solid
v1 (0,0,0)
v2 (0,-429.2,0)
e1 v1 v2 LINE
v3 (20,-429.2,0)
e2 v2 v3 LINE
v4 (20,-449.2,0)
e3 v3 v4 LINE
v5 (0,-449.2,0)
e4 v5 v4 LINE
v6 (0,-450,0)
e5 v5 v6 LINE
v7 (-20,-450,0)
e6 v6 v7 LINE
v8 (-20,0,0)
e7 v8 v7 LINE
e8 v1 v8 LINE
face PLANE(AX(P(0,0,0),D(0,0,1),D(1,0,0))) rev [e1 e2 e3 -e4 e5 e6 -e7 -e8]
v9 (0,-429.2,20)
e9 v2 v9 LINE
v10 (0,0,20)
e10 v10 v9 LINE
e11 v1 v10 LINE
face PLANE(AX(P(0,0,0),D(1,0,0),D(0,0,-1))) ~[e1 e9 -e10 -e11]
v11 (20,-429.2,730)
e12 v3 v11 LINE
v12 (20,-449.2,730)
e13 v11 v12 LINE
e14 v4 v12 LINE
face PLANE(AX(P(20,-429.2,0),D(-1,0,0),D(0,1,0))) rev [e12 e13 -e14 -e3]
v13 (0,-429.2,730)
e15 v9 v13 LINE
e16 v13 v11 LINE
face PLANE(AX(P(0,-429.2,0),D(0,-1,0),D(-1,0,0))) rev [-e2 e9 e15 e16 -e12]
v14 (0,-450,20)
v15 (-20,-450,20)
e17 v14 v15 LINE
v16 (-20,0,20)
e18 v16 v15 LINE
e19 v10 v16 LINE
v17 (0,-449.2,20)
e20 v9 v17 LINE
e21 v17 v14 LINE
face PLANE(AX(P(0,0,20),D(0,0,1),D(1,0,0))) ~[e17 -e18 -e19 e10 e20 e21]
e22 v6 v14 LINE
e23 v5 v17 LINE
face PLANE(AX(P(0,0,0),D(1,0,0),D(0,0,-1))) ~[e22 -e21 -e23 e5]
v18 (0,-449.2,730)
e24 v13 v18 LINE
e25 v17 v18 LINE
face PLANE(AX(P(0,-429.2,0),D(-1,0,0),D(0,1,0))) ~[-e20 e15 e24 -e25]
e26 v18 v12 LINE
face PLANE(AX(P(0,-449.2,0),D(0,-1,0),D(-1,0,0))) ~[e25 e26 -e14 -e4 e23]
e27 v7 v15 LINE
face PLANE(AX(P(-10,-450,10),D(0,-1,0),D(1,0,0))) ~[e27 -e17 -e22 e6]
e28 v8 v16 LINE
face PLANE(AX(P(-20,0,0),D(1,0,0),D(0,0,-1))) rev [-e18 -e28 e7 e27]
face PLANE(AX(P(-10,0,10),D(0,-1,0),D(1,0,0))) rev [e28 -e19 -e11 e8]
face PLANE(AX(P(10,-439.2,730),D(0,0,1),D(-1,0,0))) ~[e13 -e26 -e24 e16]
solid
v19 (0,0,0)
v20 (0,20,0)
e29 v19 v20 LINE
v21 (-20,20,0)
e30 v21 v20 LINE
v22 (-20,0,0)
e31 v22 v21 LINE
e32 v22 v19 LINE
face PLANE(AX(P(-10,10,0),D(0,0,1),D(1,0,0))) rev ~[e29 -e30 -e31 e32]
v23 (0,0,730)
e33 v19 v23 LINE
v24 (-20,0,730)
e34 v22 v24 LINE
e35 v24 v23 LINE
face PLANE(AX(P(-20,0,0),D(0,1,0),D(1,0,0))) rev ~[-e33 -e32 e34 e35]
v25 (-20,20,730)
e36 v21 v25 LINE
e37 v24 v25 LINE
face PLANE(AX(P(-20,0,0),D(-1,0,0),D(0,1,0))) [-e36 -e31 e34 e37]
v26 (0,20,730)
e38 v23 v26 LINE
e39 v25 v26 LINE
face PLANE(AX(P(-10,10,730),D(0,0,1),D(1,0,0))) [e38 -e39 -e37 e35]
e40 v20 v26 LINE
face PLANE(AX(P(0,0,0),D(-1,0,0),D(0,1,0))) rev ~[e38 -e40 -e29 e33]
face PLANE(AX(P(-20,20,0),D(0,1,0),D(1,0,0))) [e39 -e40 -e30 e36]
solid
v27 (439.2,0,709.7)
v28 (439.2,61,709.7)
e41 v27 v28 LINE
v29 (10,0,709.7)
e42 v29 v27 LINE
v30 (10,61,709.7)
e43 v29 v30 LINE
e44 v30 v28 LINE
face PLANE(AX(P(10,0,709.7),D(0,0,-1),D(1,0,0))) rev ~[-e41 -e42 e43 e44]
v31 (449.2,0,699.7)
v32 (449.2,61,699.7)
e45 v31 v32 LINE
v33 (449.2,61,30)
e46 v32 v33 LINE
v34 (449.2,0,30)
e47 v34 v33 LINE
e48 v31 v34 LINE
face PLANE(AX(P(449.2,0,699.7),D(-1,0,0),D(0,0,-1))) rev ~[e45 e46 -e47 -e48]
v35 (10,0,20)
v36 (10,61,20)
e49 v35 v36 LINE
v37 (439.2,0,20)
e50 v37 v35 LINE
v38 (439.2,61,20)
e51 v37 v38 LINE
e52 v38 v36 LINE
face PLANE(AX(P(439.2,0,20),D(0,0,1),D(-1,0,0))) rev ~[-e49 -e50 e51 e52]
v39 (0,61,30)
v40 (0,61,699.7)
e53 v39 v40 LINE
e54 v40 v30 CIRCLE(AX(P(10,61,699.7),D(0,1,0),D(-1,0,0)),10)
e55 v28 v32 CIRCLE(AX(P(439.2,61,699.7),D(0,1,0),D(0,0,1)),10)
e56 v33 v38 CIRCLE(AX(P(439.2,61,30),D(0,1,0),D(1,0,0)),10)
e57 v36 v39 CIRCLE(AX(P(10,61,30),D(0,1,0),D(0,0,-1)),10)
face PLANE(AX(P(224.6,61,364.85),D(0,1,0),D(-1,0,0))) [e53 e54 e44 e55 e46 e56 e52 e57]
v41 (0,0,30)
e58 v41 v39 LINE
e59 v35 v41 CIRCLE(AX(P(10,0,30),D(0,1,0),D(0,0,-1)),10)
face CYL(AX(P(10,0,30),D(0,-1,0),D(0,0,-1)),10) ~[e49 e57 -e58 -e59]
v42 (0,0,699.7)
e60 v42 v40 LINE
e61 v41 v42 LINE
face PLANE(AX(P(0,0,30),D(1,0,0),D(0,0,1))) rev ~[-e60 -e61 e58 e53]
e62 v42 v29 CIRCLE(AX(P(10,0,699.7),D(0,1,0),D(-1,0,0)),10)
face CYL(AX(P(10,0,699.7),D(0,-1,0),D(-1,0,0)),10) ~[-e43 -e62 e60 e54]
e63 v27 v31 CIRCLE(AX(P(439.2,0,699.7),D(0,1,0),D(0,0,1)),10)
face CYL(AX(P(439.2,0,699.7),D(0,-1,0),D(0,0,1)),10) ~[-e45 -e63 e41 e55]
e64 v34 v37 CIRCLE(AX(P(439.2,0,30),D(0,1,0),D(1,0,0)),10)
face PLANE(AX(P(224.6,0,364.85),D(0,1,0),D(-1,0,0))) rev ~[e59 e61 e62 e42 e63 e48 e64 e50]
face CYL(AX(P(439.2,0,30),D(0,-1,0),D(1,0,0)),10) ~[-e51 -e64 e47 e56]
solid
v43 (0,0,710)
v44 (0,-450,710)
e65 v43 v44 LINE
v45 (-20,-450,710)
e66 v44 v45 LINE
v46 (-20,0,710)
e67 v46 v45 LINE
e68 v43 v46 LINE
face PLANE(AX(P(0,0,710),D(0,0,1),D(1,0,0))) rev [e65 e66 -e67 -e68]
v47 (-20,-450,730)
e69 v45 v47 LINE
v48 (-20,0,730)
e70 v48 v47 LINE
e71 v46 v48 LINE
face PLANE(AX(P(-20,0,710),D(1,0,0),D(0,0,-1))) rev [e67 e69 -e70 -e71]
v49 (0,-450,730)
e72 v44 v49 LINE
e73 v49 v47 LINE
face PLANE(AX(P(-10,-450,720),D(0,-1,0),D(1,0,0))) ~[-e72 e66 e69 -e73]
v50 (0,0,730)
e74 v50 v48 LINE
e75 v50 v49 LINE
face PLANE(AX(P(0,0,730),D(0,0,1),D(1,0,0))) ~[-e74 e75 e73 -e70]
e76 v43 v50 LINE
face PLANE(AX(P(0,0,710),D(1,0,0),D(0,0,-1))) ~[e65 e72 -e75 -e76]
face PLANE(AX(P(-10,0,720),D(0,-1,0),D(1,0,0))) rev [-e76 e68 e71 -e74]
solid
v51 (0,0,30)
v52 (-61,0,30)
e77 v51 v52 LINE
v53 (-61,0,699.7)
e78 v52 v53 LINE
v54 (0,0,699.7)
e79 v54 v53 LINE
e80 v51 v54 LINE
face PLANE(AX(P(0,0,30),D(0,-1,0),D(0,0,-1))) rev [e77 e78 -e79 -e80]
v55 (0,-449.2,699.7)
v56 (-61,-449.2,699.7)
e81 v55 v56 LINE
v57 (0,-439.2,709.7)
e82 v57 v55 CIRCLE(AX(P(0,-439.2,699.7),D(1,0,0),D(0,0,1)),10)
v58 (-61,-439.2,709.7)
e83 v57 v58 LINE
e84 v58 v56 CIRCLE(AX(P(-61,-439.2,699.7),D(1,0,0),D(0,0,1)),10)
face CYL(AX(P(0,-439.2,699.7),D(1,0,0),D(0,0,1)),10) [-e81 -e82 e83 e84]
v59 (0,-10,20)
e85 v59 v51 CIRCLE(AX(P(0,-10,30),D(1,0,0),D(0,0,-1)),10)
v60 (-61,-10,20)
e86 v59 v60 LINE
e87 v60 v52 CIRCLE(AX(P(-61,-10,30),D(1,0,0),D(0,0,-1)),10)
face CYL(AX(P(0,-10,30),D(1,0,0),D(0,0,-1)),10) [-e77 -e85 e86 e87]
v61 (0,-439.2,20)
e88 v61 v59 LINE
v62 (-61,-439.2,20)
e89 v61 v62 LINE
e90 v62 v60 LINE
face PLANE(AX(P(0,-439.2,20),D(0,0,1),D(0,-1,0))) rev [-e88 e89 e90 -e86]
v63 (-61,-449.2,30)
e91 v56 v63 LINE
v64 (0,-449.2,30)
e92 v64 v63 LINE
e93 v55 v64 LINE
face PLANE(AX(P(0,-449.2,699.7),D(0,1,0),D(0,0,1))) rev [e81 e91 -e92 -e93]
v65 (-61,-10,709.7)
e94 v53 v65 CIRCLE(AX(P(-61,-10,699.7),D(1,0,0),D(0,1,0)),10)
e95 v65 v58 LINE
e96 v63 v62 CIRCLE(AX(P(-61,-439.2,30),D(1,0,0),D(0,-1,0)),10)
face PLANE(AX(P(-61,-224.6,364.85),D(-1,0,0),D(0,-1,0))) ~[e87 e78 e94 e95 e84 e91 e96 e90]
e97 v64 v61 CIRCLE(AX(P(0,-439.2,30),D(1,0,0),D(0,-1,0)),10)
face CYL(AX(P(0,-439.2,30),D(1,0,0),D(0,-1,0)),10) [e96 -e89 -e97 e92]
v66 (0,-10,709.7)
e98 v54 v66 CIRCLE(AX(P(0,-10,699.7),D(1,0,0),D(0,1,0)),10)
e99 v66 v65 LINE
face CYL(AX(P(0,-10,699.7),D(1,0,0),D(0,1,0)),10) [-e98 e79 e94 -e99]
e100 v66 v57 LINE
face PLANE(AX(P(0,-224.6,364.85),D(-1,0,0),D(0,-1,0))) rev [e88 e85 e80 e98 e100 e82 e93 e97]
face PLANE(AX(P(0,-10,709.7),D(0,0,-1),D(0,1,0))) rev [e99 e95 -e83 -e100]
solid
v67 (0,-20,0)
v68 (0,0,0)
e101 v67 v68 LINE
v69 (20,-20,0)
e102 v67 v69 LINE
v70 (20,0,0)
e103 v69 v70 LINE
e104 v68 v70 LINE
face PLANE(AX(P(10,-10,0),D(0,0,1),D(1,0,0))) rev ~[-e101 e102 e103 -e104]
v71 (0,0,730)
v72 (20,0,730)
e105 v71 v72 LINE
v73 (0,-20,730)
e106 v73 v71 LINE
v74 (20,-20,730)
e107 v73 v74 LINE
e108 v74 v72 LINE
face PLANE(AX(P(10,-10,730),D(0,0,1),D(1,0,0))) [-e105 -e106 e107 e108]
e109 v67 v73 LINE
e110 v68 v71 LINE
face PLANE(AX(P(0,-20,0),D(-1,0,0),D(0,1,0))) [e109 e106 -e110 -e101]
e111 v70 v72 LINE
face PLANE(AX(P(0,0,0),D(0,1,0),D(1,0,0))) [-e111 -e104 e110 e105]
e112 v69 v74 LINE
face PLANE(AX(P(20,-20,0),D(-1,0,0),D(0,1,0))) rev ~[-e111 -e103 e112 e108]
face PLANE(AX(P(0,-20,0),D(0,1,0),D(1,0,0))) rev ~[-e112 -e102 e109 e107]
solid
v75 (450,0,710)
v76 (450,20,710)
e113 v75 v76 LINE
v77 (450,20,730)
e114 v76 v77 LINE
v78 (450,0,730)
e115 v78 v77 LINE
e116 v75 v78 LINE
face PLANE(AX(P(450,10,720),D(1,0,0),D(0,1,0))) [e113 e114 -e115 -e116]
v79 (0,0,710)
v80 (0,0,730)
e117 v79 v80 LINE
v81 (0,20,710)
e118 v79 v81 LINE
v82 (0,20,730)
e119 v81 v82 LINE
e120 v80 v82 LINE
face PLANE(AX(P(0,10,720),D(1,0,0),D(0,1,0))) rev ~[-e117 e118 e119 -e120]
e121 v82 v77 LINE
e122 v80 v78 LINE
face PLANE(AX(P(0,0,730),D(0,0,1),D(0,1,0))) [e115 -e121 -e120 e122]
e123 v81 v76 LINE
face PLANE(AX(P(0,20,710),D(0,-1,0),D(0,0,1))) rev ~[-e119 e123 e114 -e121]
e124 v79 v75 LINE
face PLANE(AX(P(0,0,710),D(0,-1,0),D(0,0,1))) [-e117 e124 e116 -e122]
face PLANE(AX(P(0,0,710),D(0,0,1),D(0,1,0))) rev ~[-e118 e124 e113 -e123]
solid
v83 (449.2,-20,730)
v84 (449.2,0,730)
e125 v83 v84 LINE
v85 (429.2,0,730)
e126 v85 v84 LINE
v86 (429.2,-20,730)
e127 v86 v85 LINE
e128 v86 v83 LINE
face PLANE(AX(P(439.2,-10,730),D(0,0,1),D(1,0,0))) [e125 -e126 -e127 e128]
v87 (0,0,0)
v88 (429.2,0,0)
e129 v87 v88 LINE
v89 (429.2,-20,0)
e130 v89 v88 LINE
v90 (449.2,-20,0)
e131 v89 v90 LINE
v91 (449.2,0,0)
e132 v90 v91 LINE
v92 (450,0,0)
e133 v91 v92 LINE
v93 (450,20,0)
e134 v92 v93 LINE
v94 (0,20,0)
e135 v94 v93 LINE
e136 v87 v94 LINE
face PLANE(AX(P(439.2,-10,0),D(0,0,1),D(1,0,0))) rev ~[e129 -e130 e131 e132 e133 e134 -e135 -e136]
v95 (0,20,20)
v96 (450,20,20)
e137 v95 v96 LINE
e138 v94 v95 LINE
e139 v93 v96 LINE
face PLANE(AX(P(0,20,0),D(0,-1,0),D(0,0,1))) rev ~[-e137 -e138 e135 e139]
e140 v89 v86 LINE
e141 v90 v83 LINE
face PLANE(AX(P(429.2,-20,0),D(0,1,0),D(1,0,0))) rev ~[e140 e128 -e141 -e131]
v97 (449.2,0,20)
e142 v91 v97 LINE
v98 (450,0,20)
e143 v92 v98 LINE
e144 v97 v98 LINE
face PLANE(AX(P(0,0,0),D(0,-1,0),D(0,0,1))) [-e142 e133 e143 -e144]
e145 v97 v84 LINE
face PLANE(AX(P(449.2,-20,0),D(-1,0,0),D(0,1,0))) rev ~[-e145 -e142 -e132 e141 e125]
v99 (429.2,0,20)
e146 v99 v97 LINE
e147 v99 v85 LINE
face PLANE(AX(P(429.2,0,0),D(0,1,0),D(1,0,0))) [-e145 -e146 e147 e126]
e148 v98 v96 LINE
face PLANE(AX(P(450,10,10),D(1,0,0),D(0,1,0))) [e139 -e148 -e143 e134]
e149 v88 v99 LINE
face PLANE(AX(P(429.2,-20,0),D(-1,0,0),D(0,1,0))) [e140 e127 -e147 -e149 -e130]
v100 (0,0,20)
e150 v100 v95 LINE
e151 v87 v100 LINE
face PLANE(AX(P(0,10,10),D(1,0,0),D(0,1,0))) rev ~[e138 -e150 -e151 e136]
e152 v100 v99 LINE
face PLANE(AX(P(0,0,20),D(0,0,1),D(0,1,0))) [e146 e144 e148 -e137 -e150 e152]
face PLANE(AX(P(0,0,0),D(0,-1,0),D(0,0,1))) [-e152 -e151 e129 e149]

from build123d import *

# Parameters (mm, degrees)
F0_W      = 20
F0_H      = 20
F3_DEPTH  = 730
F4_DEPTH  = 730
F5_W      = 20
F5_H      = 20
F6_DEPTH  = 450
F8_DEPTH  = 61
F9_W      = 20
F9_H      = 20
F10_DEPTH = 730
F11_W     = 20
F11_H     = 20
F12_DEPTH = 450


# Not quite as in the source:
# - a feature of the source that left no trace in its solid (it failed there, or was rolled back) is left out
# - a pattern or mirror of a feature is missing from the dataset's text; its kind, count and spacing are read off the source's solid


with BuildPart() as f3:
    # F0 (on Top) → F3 (new body)
    with BuildSketch(Plane.XY):
        with Locations((-10, 10)):
            Rectangle(F0_W, F0_H)
    extrude(amount=F3_DEPTH)


with BuildPart() as f4:
    # F0 (on Top) → F4 (new body)
    with BuildSketch(Plane.XY):
        with Locations((10, -10)):
            Rectangle(F0_W, F0_H)
    extrude(amount=F4_DEPTH)


with BuildPart() as f4_copies_1:
    # F4_copies: instance of F4
    add(f4.part.mirror(Plane(origin=(0, -224.6, 0), x_dir=(0, 0, -1), z_dir=(0, -1, 0))))

    # F6_copies: F6 across plane


with BuildPart() as f6:
    # F5 (on face) → F6 (new body)
    with BuildSketch(Plane.YZ):
        with Locations((10, 10)):
            Rectangle(F5_W, F5_H)
    extrude(amount=F6_DEPTH)


with BuildPart() as f4_copies_1_1:
    add(f4_copies_1.part)
    add(f6.part.mirror(Plane(origin=(0, 0, 0), x_dir=(0.7071067812, -0.7071067812, 0), z_dir=(-0.7071067812, -0.7071067812, 0))))


with BuildPart() as f8:
    # F7 (on face) → F8 (new body)
    with BuildSketch(Plane(origin=(0, 0, 0), x_dir=(-1, 0, 0), z_dir=(0, 1, 0))):
        with BuildLine():
            Line((-439.2, 20), (-10, 20))
            ThreePointArc((-10, 20), (-2.9289321881, 22.9289321881), (0, 30))
            Line((0, 30), (0, 699.7))
            ThreePointArc((0, 699.7), (-2.9289321881, 706.7710678119), (-10, 709.7))
            Line((-10, 709.7), (-439.2, 709.7))
            ThreePointArc((-439.2, 709.7), (-446.2710678119, 706.7710678119), (-449.2, 699.7))
            Line((-449.2, 699.7), (-449.2, 30))
            ThreePointArc((-449.2, 30), (-446.2710678119, 22.9289321881), (-439.2, 20))
        make_face()
    extrude(amount=F8_DEPTH)


with BuildPart() as f8_copies_1:
    # F8_copies: instance of F8
    add(f8.part.mirror(Plane(origin=(0, 0, 0), x_dir=(-0.7071067812, 0.7071067812, 0), z_dir=(-0.7071067812, -0.7071067812, 0))))


with BuildPart() as f6_1:
    add(f6.part)

    # F9 (on Top) → F10 (join)
    with BuildSketch(Plane.XY):
        with Locations((439.2, -10)):
            Rectangle(F9_W, F9_H)
    extrude(amount=F10_DEPTH)


with BuildPart() as f12:
    # F11 (on face) → F12 (new body)
    with BuildSketch(Plane.YZ):
        with Locations((10, 720)):
            Rectangle(F11_W, F11_H)
    extrude(amount=F12_DEPTH)


with BuildPart() as f12_copies_1:
    # F12_copies: instance of F12
    add(f12.part.mirror(Plane(origin=(0, 0, 0), x_dir=(-0.7071067812, 0.7071067812, 0), z_dir=(-0.7071067812, -0.7071067812, 0))))


solid = Compound([f3.part, f4.part, f4_copies_1_1.part, f8.part, f8_copies_1.part, f6_1.part, f12.part, f12_copies_1.part])
